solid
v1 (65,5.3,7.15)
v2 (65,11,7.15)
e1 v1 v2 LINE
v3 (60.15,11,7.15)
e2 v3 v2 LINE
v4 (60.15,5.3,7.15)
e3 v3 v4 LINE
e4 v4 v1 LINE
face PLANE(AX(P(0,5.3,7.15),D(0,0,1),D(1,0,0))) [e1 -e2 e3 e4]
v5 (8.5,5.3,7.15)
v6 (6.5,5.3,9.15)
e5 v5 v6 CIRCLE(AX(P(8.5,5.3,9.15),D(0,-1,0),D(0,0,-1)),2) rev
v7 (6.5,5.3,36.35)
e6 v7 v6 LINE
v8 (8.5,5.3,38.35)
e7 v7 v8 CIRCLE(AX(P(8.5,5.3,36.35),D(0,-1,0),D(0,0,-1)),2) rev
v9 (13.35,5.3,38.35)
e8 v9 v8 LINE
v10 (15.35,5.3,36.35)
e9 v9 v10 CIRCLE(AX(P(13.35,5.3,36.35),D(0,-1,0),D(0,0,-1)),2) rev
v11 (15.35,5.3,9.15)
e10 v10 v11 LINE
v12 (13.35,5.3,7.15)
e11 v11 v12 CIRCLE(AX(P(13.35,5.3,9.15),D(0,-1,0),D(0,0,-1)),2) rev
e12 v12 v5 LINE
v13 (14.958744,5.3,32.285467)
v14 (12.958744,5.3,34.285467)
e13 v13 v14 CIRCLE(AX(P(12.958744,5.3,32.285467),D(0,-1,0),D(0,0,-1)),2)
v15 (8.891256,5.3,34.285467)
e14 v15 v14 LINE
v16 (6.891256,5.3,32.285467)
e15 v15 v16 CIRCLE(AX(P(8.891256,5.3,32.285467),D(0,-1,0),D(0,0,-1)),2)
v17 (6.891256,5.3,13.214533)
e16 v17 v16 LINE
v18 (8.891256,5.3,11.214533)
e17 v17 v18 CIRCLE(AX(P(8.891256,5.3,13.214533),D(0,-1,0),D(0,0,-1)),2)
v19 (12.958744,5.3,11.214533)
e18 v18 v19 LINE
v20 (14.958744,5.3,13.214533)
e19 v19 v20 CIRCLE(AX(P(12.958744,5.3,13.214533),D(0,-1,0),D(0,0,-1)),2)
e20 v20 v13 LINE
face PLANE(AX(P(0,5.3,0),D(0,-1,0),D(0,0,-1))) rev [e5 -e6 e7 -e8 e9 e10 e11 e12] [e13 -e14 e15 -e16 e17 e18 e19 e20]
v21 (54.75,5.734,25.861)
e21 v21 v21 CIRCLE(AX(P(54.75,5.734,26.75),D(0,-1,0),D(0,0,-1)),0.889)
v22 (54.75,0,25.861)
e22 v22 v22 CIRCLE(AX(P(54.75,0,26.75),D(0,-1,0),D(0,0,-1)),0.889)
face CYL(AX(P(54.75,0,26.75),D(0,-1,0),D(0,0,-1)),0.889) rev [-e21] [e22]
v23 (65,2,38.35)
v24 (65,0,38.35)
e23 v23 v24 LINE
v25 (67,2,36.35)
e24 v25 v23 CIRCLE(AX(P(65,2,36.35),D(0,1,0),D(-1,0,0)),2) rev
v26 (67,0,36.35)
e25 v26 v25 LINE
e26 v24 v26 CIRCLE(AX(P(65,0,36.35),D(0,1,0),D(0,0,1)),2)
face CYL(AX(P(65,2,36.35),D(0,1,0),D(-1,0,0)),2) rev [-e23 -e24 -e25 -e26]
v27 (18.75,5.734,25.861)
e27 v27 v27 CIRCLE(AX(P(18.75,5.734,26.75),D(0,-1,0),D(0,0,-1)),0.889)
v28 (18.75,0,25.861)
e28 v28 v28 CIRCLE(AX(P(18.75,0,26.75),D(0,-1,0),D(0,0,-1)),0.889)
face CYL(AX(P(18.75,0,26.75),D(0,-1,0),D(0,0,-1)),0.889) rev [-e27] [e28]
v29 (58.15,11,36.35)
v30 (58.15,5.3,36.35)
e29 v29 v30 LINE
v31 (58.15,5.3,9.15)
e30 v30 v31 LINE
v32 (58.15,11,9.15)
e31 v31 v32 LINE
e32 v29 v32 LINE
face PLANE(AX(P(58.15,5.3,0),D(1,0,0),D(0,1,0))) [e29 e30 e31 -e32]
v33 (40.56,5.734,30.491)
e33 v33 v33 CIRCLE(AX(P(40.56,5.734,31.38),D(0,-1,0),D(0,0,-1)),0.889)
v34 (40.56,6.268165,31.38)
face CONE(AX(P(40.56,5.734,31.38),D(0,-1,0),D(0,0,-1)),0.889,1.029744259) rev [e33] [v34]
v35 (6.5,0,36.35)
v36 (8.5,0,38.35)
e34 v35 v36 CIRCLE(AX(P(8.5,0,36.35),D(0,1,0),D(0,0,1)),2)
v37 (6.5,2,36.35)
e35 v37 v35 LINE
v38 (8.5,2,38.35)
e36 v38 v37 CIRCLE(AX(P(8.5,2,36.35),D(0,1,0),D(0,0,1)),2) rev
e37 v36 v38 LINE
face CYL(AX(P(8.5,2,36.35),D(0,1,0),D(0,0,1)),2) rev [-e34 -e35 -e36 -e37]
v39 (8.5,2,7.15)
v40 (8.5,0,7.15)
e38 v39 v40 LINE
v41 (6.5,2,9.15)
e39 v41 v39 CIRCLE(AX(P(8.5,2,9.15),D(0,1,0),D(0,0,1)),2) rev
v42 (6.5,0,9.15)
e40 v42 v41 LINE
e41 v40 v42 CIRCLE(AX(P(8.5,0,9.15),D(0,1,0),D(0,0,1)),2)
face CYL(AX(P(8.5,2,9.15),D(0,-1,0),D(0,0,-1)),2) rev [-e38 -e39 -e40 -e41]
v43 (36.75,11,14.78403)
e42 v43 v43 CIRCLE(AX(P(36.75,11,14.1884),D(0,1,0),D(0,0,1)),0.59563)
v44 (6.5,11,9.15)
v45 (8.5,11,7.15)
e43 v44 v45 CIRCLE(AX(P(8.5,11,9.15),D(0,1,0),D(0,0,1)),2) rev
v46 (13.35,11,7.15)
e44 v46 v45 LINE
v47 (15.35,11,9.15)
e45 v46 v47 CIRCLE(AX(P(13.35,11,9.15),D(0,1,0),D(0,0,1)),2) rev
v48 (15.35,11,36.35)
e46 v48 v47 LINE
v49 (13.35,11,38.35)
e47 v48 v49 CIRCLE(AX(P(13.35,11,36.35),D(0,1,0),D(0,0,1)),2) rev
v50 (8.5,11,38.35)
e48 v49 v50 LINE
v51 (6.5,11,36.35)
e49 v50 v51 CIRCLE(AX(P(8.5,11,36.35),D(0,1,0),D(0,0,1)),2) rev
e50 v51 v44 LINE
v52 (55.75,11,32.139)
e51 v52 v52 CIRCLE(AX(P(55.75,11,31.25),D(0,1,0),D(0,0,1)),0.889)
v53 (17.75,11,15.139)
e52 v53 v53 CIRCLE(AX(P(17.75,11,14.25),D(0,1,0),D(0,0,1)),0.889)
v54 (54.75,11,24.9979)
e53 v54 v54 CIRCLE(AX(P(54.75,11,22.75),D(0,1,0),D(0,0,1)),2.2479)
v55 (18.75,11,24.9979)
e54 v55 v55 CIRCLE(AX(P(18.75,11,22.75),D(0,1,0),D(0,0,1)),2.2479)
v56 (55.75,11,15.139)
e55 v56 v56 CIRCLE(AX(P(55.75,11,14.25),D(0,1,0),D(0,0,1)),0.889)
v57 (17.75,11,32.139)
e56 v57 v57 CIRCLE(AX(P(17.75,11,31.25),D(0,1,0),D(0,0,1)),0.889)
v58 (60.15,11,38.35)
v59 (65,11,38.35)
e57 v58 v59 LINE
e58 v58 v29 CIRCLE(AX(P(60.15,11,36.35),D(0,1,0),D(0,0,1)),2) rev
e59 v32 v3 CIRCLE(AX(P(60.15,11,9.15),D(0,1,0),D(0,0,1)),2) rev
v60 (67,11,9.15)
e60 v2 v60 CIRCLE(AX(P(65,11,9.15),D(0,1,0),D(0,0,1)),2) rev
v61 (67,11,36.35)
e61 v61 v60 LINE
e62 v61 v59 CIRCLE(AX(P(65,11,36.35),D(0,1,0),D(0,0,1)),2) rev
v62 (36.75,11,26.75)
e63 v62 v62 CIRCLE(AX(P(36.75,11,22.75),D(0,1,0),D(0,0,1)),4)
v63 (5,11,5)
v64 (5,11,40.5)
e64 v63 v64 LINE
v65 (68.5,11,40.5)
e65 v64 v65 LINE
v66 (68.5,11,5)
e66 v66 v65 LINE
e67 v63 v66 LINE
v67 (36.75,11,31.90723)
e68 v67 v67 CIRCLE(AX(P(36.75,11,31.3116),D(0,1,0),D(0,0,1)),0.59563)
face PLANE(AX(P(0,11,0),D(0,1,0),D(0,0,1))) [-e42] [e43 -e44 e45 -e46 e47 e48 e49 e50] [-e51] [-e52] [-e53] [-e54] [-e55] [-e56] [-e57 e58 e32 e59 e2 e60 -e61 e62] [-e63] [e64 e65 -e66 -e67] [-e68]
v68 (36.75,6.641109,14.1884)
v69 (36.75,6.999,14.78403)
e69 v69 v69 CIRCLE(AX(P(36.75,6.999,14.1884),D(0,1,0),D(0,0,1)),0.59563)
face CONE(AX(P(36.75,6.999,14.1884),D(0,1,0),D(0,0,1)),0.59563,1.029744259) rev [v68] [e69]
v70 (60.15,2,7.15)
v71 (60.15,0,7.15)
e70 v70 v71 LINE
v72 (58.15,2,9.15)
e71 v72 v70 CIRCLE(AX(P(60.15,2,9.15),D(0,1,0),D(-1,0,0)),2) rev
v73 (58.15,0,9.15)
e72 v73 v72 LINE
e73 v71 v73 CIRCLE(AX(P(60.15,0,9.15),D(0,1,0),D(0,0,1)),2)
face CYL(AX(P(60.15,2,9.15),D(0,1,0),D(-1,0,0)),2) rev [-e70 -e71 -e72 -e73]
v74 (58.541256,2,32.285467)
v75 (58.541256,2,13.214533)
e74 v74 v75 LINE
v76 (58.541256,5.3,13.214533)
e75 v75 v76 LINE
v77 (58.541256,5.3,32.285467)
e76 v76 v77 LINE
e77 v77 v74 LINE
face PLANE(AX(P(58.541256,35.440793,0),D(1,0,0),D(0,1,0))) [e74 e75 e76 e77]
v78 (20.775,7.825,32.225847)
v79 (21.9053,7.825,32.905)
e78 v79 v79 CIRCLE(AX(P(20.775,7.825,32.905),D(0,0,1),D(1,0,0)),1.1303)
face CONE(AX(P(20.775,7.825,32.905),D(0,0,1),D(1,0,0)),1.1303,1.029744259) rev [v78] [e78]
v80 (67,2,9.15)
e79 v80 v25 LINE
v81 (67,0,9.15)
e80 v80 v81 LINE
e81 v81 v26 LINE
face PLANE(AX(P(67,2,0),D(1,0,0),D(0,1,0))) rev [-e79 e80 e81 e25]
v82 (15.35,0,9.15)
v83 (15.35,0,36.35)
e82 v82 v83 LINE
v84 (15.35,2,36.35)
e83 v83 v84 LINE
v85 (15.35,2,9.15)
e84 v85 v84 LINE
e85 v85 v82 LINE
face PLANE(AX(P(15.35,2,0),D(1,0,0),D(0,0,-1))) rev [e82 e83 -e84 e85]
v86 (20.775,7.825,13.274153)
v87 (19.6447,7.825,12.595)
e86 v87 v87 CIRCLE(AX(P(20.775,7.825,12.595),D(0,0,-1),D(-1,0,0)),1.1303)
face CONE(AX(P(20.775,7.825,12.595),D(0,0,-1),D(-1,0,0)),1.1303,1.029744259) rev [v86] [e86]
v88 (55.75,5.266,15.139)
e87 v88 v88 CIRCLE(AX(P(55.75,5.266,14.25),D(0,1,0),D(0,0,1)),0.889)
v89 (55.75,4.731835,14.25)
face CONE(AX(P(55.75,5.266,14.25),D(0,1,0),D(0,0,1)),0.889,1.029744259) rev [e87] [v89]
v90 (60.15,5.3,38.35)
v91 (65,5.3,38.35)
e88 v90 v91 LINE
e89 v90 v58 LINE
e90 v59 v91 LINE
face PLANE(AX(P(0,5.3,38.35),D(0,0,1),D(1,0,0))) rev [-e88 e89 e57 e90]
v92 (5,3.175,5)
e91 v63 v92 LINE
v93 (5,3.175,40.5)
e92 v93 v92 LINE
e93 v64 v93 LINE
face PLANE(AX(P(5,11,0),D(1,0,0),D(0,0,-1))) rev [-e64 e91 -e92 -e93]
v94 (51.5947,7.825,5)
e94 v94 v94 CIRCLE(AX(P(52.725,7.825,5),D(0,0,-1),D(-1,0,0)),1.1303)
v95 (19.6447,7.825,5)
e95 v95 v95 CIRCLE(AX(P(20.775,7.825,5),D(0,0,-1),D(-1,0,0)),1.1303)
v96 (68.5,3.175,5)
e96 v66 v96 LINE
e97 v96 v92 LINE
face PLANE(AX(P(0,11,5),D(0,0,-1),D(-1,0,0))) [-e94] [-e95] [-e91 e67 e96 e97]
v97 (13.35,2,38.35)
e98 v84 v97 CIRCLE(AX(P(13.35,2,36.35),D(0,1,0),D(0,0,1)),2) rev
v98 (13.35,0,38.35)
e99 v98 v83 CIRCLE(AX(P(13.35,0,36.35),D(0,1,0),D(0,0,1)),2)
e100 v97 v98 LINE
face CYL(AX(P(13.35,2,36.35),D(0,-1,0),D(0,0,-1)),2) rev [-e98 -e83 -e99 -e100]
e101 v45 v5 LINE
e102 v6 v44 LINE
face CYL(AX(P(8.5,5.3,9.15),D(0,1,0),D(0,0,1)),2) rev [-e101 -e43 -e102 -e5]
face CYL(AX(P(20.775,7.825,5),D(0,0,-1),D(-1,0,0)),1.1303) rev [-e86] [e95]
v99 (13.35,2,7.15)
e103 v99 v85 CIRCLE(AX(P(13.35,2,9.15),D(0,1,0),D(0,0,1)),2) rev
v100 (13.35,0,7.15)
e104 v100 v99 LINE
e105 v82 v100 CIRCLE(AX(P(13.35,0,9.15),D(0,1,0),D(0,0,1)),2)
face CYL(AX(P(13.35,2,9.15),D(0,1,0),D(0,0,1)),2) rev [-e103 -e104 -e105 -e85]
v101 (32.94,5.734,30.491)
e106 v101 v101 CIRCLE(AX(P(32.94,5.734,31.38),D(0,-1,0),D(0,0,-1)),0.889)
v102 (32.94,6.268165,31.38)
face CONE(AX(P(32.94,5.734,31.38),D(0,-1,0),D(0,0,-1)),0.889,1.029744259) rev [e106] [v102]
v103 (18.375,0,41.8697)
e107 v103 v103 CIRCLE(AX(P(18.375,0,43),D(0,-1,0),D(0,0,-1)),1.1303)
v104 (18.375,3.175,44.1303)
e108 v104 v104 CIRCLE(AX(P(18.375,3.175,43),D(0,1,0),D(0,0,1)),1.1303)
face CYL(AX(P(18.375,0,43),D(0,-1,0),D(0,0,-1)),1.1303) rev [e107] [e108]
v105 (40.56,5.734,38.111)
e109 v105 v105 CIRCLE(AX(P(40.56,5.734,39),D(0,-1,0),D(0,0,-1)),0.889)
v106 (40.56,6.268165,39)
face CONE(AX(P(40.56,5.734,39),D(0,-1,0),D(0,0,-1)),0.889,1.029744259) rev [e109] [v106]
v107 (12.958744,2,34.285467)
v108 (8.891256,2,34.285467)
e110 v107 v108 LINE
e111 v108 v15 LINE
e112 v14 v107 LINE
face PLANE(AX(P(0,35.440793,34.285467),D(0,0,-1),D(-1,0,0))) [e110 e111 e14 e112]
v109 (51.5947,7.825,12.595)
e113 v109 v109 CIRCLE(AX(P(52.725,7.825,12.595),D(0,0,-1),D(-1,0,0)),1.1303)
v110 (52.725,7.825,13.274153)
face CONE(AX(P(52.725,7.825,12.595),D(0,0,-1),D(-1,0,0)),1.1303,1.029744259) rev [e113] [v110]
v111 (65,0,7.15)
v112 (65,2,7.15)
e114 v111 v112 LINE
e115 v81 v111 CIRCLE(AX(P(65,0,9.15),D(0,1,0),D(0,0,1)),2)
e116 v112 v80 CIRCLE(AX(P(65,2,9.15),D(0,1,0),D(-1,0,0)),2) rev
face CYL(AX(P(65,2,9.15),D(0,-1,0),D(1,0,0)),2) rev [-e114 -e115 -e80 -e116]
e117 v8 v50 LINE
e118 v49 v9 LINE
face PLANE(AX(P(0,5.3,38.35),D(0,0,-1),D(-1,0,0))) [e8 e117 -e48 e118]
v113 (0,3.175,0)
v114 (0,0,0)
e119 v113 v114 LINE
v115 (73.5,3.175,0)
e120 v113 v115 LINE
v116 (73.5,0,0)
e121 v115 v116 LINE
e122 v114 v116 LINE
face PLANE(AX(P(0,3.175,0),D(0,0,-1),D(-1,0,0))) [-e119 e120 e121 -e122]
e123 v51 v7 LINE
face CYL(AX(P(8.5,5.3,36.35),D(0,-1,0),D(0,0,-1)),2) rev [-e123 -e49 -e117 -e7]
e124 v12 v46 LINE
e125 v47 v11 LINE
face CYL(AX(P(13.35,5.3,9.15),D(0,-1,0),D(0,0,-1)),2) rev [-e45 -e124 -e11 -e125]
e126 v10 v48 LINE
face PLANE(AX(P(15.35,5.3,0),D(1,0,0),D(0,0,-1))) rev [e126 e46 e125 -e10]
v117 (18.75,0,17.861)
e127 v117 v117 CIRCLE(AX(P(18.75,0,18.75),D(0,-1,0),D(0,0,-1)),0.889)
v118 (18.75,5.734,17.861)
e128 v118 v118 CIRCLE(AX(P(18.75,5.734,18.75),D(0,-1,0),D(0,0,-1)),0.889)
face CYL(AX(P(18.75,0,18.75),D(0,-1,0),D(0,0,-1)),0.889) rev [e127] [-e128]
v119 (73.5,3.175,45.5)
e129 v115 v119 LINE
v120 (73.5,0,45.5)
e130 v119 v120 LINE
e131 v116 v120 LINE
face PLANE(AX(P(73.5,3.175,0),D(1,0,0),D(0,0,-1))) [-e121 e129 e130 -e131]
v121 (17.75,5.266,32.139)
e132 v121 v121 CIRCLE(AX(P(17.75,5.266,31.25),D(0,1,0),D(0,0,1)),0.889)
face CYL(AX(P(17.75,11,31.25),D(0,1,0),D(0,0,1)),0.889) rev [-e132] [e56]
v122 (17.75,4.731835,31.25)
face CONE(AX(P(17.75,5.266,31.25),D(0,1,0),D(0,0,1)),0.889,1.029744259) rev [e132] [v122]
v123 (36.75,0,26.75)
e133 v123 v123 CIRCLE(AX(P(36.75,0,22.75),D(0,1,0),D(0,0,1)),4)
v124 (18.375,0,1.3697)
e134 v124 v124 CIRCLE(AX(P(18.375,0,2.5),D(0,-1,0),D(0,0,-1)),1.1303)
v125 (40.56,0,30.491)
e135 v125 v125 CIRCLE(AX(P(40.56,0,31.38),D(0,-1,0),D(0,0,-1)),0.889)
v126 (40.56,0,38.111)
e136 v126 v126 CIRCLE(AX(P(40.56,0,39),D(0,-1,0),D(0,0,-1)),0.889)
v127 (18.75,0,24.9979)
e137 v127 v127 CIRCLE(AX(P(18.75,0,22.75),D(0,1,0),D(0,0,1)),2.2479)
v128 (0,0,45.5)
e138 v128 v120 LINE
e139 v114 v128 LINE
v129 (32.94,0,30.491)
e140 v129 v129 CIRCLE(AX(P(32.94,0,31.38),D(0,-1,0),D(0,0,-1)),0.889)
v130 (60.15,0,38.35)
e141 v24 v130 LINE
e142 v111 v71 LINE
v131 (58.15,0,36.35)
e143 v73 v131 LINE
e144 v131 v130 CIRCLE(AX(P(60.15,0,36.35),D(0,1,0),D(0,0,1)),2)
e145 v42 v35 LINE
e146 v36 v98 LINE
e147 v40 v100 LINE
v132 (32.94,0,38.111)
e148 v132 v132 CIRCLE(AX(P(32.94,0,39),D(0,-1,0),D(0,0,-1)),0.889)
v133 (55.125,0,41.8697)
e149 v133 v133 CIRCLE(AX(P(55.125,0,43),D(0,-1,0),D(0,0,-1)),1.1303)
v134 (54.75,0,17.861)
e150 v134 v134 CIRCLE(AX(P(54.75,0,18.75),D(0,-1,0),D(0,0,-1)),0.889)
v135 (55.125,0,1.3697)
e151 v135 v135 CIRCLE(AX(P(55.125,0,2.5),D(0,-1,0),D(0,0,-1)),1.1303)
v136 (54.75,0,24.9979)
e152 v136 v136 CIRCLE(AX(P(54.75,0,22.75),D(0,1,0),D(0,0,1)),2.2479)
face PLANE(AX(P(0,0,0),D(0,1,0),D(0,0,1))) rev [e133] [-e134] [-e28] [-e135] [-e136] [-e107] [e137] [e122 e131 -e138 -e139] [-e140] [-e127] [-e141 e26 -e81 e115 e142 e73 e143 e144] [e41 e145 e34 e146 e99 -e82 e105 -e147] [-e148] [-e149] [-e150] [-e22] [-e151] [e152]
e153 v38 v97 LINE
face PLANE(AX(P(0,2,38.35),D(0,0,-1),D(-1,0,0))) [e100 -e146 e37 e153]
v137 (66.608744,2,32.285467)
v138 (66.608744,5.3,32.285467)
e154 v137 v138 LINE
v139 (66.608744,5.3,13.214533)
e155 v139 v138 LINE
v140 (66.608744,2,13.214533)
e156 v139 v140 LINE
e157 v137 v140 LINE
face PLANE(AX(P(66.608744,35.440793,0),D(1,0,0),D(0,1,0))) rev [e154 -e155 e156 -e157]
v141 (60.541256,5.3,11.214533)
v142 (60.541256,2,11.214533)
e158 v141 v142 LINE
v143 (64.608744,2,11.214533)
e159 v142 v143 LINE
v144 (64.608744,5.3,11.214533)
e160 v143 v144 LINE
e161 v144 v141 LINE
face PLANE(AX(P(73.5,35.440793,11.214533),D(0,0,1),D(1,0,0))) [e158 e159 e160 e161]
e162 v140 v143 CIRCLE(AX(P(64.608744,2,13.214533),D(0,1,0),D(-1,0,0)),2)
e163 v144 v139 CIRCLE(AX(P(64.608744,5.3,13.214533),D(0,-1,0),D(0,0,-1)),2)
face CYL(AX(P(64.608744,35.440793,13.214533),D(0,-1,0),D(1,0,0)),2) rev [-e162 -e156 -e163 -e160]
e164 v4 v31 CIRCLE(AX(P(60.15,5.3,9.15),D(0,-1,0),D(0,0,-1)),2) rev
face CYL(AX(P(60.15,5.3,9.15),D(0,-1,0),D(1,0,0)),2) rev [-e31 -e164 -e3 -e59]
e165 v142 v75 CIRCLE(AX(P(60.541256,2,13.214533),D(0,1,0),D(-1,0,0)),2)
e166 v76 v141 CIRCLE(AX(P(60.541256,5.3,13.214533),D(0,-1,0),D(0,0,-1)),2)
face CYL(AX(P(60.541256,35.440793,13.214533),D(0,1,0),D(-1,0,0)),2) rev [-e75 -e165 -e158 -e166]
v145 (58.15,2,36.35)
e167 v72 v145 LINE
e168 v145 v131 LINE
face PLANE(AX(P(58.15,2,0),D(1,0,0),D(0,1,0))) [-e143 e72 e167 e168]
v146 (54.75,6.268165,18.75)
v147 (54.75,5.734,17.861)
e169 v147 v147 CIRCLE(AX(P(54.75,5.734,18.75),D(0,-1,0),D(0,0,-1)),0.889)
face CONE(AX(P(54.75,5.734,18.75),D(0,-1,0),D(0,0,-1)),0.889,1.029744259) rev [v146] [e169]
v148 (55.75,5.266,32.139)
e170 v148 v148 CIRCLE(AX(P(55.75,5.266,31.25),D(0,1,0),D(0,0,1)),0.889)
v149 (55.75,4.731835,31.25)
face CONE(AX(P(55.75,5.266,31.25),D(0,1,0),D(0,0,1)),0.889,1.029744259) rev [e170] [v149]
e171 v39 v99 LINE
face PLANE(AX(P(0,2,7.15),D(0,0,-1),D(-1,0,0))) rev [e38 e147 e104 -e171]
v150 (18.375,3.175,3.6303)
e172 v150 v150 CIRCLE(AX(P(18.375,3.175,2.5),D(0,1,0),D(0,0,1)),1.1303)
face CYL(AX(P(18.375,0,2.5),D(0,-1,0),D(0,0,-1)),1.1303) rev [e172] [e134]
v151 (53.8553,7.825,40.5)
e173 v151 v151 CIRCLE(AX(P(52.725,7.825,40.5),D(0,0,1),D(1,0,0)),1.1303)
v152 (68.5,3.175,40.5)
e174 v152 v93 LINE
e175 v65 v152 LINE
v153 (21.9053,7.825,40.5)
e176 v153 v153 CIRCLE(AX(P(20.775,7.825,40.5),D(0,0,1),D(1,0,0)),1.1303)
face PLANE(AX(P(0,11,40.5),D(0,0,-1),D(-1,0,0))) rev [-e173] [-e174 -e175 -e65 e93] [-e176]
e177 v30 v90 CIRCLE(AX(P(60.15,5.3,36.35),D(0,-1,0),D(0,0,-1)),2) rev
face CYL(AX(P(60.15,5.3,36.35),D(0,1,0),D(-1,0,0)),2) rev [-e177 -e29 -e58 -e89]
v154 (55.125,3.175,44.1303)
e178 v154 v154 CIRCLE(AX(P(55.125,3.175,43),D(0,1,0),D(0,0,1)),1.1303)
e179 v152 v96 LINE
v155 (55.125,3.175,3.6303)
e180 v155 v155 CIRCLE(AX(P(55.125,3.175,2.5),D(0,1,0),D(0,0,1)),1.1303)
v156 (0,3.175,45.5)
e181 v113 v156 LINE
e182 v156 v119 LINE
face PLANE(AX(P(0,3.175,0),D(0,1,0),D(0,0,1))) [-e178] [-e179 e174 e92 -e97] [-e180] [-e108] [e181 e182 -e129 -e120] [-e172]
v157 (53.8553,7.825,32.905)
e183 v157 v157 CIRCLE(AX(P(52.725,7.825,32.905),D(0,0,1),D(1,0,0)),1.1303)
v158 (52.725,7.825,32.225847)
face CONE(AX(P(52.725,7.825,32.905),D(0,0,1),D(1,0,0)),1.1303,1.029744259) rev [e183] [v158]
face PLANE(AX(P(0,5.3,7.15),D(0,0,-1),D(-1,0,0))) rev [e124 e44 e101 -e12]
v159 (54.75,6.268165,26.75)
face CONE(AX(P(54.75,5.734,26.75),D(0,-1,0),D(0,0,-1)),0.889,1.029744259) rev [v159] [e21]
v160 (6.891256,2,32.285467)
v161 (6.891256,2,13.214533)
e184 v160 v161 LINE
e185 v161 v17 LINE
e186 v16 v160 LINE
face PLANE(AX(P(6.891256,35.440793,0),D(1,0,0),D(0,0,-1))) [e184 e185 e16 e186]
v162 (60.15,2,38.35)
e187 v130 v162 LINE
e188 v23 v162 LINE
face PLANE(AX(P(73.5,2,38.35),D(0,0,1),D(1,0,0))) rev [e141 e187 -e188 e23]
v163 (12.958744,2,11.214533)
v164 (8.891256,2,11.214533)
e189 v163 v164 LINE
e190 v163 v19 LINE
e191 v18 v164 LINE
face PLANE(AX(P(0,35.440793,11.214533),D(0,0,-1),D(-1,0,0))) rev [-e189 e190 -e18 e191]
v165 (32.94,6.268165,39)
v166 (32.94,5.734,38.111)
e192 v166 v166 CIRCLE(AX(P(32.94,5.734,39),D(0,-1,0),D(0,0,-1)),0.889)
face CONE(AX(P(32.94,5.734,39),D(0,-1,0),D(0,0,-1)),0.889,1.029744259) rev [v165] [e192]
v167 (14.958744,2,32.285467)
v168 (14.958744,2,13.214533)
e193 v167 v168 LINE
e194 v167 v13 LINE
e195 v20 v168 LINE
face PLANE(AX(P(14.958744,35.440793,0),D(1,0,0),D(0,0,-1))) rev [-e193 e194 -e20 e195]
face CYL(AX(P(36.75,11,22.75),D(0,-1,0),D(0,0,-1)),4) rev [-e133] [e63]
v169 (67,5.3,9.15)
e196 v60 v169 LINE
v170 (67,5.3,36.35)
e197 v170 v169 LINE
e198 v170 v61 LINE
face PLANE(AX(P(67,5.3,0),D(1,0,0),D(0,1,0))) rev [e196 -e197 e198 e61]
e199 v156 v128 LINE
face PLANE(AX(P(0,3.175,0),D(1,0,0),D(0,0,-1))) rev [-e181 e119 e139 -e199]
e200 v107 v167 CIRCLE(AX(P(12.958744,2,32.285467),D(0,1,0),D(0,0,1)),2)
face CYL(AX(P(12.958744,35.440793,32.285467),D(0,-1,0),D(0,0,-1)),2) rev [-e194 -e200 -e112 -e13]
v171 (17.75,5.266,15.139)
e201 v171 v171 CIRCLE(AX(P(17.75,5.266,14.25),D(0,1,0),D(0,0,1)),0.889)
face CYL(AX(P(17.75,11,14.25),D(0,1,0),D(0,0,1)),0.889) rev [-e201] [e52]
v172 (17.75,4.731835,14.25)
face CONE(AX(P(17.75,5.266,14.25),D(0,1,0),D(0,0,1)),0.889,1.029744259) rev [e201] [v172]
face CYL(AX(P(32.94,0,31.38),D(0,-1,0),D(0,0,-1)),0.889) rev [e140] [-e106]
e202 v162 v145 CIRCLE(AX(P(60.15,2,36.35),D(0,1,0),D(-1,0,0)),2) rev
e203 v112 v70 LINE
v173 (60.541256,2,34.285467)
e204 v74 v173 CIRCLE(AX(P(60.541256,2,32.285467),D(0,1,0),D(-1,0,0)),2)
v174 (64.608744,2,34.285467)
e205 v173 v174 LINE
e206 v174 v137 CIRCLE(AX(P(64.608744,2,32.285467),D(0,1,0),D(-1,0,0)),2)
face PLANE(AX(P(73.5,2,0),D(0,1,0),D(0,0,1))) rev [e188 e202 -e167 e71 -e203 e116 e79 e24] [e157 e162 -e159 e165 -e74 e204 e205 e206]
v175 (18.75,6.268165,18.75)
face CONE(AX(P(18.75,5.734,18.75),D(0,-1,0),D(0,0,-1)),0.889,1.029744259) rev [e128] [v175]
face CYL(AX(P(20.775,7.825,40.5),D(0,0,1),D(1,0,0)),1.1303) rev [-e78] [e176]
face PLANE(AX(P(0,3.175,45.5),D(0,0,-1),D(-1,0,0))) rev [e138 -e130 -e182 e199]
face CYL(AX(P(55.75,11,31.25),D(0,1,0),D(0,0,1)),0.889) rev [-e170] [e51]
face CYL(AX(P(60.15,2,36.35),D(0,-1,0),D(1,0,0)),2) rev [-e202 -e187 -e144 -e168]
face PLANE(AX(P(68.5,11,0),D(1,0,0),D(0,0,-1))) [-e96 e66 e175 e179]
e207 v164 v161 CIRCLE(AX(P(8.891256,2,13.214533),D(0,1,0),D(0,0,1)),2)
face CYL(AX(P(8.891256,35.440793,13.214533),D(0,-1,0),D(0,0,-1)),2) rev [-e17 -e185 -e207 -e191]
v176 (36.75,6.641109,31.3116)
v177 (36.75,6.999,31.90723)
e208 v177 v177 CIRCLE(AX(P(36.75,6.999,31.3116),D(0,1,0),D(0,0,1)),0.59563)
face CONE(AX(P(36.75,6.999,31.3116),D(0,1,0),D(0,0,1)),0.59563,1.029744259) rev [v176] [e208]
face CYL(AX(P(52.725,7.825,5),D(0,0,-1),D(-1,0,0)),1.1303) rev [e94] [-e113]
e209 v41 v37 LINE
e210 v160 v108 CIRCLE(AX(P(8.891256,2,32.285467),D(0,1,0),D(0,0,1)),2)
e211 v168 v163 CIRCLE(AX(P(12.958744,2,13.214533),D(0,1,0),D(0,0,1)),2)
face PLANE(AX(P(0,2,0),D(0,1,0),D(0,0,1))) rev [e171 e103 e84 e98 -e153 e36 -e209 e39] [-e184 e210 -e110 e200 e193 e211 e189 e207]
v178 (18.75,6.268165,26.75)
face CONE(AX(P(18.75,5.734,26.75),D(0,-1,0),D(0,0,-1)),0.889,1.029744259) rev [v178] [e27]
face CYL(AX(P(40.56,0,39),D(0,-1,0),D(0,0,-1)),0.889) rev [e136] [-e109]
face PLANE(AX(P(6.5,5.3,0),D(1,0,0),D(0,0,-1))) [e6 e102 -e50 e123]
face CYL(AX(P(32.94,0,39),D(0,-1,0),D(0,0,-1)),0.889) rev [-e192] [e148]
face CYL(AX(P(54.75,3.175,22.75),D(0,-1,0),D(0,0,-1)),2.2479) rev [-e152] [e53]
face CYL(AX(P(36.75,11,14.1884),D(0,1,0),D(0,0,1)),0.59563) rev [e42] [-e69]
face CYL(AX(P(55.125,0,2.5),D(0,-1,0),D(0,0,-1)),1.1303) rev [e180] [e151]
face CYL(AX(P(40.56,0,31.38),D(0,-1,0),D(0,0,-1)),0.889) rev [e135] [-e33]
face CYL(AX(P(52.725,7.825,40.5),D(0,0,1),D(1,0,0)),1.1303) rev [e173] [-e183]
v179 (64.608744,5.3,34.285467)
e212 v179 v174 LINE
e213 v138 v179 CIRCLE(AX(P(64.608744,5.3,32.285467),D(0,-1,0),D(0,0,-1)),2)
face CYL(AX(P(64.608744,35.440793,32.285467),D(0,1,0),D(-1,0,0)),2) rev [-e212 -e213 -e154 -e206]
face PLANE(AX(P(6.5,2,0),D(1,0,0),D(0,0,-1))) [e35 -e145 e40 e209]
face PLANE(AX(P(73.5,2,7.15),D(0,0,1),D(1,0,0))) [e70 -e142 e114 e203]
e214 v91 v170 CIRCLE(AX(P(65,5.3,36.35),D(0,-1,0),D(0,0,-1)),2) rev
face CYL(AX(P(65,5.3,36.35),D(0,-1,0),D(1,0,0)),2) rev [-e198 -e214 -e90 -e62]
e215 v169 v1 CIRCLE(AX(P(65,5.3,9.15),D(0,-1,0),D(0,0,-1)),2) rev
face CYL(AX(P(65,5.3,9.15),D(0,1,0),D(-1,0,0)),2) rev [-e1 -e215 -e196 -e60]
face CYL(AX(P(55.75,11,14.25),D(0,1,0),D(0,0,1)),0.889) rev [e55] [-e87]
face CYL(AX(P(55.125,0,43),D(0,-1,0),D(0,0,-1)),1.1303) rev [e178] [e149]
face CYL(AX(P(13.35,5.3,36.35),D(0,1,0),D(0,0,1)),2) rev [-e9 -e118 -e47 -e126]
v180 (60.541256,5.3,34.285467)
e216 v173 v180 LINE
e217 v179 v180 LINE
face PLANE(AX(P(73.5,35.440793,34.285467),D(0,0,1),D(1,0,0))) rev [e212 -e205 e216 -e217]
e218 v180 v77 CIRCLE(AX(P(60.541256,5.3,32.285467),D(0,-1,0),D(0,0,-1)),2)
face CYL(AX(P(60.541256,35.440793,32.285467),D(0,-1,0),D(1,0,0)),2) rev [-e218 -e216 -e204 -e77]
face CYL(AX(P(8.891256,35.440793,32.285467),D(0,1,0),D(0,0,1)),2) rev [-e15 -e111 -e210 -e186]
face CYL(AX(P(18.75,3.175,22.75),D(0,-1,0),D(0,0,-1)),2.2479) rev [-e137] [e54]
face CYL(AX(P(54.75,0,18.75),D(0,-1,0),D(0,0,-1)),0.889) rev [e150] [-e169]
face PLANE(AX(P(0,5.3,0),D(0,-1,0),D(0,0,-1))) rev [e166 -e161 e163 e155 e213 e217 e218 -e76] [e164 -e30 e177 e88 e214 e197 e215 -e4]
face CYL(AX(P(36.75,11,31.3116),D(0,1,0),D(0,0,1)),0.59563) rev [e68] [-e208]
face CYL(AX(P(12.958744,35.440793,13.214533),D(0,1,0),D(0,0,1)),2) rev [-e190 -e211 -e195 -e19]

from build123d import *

# Parameters (mm, degrees)
MAIN_SKETCH_W                         = 73.5
MAIN_SKETCH_H                         = 45.5
MAIN_SKETCH_W_2                       = 8.85
MAIN_SKETCH_H_2                       = 31.2
MAIN_SKETCH_R                         = 2.2479
LIP_DEPTH                             = 3.175
MOUNTING_BASE_OUTLINE_W               = 63.5
MOUNTING_BASE_OUTLINE_H               = 35.5
MOUNTING_BASE_OUTLINE_R               = 2.2479
MOUNTING_BASE_OUTLINE_R_2             = 4
MOUNTING_BASE_DEPTH                   = 11
HEATER_CART_4_40_TAPS_D               = 2.2606
HEATER_CART_4_40_TAPS_DEPTH           = 7.595
HEATER_CART_4_40_TAPS_TIP             = 0.679152758
HEATER_CART_4_40_TAPS_ON_FACE_2_D     = 2.2606
HEATER_CART_4_40_TAPS_ON_FACE_2_DEPTH = 7.595
HEATER_CART_4_40_TAPS_ON_FACE_2_TIP   = 0.679152758
MAIN_SKETCH_12_W                      = 8.85
MAIN_SKETCH_12_H                      = 31.2
MAIN_SKETCH_12_R                      = 0.285
BOTTOM_SQUARE_CUTOUT_DEPTH            = 2
SQUARE_MICRO_D_CUTOUT_START           = 5.3
SQUARE_MICRO_D_CUTOUT_OUTLINE_W       = 8.85
SQUARE_MICRO_D_CUTOUT_OUTLINE_H       = 31.2
SQUARE_MICRO_D_CUTOUT_OUTLINE_R       = 0.285
SQUARE_MICRO_D_CUTOUT_DEPTH           = 5.7
SKETCH15_W                            = 8.067488146
SKETCH15_H                            = 23.070933647
CUT_EXTRUDE1_DEPTH                    = 11
INTERNAL_CORNER_CUTOUTS_FILLET_R      = 2
CHIP_CLAMP_0_80_TAPS_AT_2_COUNT       = 2
CHIP_CLAMP_0_80_TAPS_AT_2_PITCH       = 17.1232
CHIP_CLAMP_0_80_TAPS_AT_3_COUNT       = 2
CHIP_CLAMP_0_80_TAPS_AT_3_PITCH       = 17.1232
F_2_56_CLOSE_CLEAR_43_0_089_D         = 2.2606
PCB_2_56_TAPS_D                       = 1.778
PCB_2_56_TAPS_DEPTH                   = 5.734
PCB_2_56_TAPS_TIP                     = 0.53416509
BOTTOM_COVER_2_56_TAPS_D              = 1.778
BOTTOM_COVER_2_56_TAPS_DEPTH          = 5.734
BOTTOM_COVER_2_56_TAPS_TIP            = 0.53416509
F_2_56_TAPPED_HOLE1_D                 = 1.778
F_2_56_TAPPED_HOLE1_DEPTH             = 5.734
F_2_56_TAPPED_HOLE1_TIP               = 0.53416509


# Read off the part's stored shape, not the designer's step: Mounting_Base, Square_Micro_D_Cutout
with BuildPart() as part:
    # Main_Sketch → Lip (new body)
    with BuildSketch(Plane(origin=(0, 0, 0), x_dir=(1, 0, 0), z_dir=(0, 1, 0))):
        with Locations((36.75, -22.75)):
            Rectangle(MAIN_SKETCH_W, MAIN_SKETCH_H)
        with Locations((10.925, -22.749999985)):
            Rectangle(MAIN_SKETCH_W_2, MAIN_SKETCH_H_2, mode=Mode.SUBTRACT)
        with Locations(Location((18.75, -22.75, 0), (0, 0, 270))):
            Circle(MAIN_SKETCH_R, mode=Mode.SUBTRACT)
        with BuildLine():
            ThreePointArc((31.675, -20.175), (29.907233047, -15.907233047), (34.175, -17.675))
            Line((34.175, -17.675), (39.325, -17.675))
            ThreePointArc((39.325, -17.675), (43.592766953, -15.907233047), (41.825, -20.175))
            Line((41.825, -20.175), (41.825, -25.325))
            ThreePointArc((41.825, -25.325), (43.592766953, -29.592766953), (39.325, -27.825))
            Line((39.325, -27.825), (34.175, -27.825))
            ThreePointArc((34.175, -27.825), (29.907233047, -29.592766953), (31.675, -25.325))
            Line((31.675, -25.325), (31.675, -20.175))
        make_face(mode=Mode.SUBTRACT)
        with Locations(Location((54.75, -22.75, 0), (0, 0, 270))):
            Circle(MAIN_SKETCH_R, mode=Mode.SUBTRACT)
    extrude(amount=LIP_DEPTH)

    # Mounting_Base outline → Mounting_Base (add)
    with BuildSketch(Plane(origin=(0, 0, 0), x_dir=(1, 0, 0), z_dir=(0, 1, 0))):
        with Locations((36.75, -22.75)):
            Rectangle(MOUNTING_BASE_OUTLINE_W, MOUNTING_BASE_OUTLINE_H)
        with Locations((18.75, -22.75)):
            Circle(MOUNTING_BASE_OUTLINE_R, mode=Mode.SUBTRACT)
        with Locations((54.75, -22.75)):
            Circle(MOUNTING_BASE_OUTLINE_R, mode=Mode.SUBTRACT)
        with Locations((36.75, -22.75)):
            Circle(MOUNTING_BASE_OUTLINE_R_2, mode=Mode.SUBTRACT)
    extrude(amount=MOUNTING_BASE_DEPTH)

    # Heater_Cart_#4-40_Taps
    with Locations(Plane(origin=(52.725, 7.825, 5), x_dir=(-1, 0, 0), z_dir=(0, 0, -1))):
        with Locations((0, 0), (31.95, 0)):
            Hole(HEATER_CART_4_40_TAPS_D / 2, depth=HEATER_CART_4_40_TAPS_DEPTH)
            with Locations((0, 0, -(HEATER_CART_4_40_TAPS_DEPTH + HEATER_CART_4_40_TAPS_TIP / 2))):  # 118° drill point
                Cone(0, HEATER_CART_4_40_TAPS_D / 2, HEATER_CART_4_40_TAPS_TIP, mode=Mode.SUBTRACT)

    # Heater_Cart_#4-40_Taps on face 2
    with Locations(Plane(origin=(20.775, 7.825, 40.5), x_dir=(1, 0, 0), z_dir=(0, 0, 1))):
        with Locations((0, 0), (31.95, 0)):
            Hole(HEATER_CART_4_40_TAPS_ON_FACE_2_D / 2, depth=HEATER_CART_4_40_TAPS_ON_FACE_2_DEPTH)
            with Locations((0, 0, -(HEATER_CART_4_40_TAPS_ON_FACE_2_DEPTH + HEATER_CART_4_40_TAPS_ON_FACE_2_TIP / 2))):  # 118° drill point
                Cone(0, HEATER_CART_4_40_TAPS_ON_FACE_2_D / 2, HEATER_CART_4_40_TAPS_ON_FACE_2_TIP, mode=Mode.SUBTRACT)

    # Main_Sketch<12> → Bottom_square_cutout (cut)
    # profile 1 of 2: a face of its own
    with BuildSketch(Plane(origin=(0, 0, 0), x_dir=(1, 0, 0), z_dir=(0, 1, 0))):
        with Locations((10.925, -22.749999985)):
            Rectangle(MAIN_SKETCH_12_W, MAIN_SKETCH_12_H)
        with BuildLine():
            ThreePointArc((10.385689992, -35.285466808), (9.155254643, -35.471894814), (7.986136174, -35.045410869))
            ThreePointArc((7.986136174, -35.045410869), (7.18175843, -34.143309058), (6.891255927, -32.970099985))
            Line((6.891255927, -32.970099985), (6.891255927, -12.529899985))
            ThreePointArc((6.891255927, -12.529899985), (7.18175845, -11.356690961), (7.986136174, -10.454589189))
            ThreePointArc((7.986136174, -10.454589189), (9.155254643, -10.028105244), (10.385689992, -10.21453325))
            Line((10.385689992, -10.21453325), (13.424612074, -11.500982853))
            ThreePointArc((13.424612074, -11.500982853), (14.540409069, -12.427601581), (14.958744073, -13.816349588))
            Line((14.958744073, -13.816349588), (14.958744073, -31.683650456))
            ThreePointArc((14.958744073, -31.683650456), (14.540409073, -33.072398471), (13.424612074, -33.999017205))
            Line((13.424612074, -33.999017205), (10.385689992, -35.285466808))
        make_face(mode=Mode.SUBTRACT)
    # profile 2 of 2: a face of its own
    with BuildSketch(Plane(origin=(0, 0, 0), x_dir=(1, 0, 0), z_dir=(0, 1, 0))):
        with BuildLine():
            ThreePointArc((7.986136174, -35.045410869), (7.18175843, -34.143309058), (6.891255927, -32.970099985))
            Line((6.891255927, -32.970099985), (6.891255927, -12.529899985))
            ThreePointArc((6.891255927, -12.529899985), (7.18175845, -11.356690961), (7.986136174, -10.454589189))
            ThreePointArc((7.986136174, -10.454589189), (9.155254643, -10.028105244), (10.385689992, -10.21453325))
            Line((10.385689992, -10.21453325), (13.424612074, -11.500982853))
            ThreePointArc((13.424612074, -11.500982853), (14.540409069, -12.427601581), (14.958744073, -13.816349588))
            Line((14.958744073, -13.816349588), (14.958744073, -31.683650456))
            ThreePointArc((14.958744073, -31.683650456), (14.540409073, -33.072398471), (13.424612074, -33.999017205))
            Line((13.424612074, -33.999017205), (10.385689992, -35.285466808))
            ThreePointArc((10.385689992, -35.285466808), (9.155254643, -35.471894814), (7.986136174, -35.045410869))
        make_face()
        with Locations(Location((10.239255927, -22.75, 0), (0, 0, 270))):
            Circle(MAIN_SKETCH_12_R, mode=Mode.SUBTRACT)
    bottom_square_cutout = extrude(amount=BOTTOM_SQUARE_CUTOUT_DEPTH, mode=Mode.SUBTRACT)

    # Square_Micro_D_Cutout outline → Square_Micro_D_Cutout (cut)
    with BuildSketch(Plane(origin=(0, 0, 0), x_dir=(1, 0, 0), z_dir=(0, 1, 0)).offset(SQUARE_MICRO_D_CUTOUT_START)):
        with Locations((10.925, -22.749999985)):
            Rectangle(SQUARE_MICRO_D_CUTOUT_OUTLINE_W, SQUARE_MICRO_D_CUTOUT_OUTLINE_H)
        with Locations((10.239255927, -22.75)):
            Circle(SQUARE_MICRO_D_CUTOUT_OUTLINE_R, mode=Mode.SUBTRACT)
    square_micro_d_cutout = extrude(amount=SQUARE_MICRO_D_CUTOUT_DEPTH, mode=Mode.SUBTRACT)

    # Sketch15 → Cut-Extrude1 (cut)
    with BuildSketch(Plane(origin=(0, 0, 0), x_dir=(1, 0, 0), z_dir=(0, 1, 0))):
        with Locations((10.925, -22.749999985)):
            Rectangle(SKETCH15_W, SKETCH15_H)
    cut_extrude1 = extrude(amount=CUT_EXTRUDE1_DEPTH, mode=Mode.SUBTRACT)

    # MicroD_Mirror: Bottom_square_cutout, Square_Micro_D_Cutout, Cut-Extrude1 across plane
    add(bottom_square_cutout.mirror(Plane(origin=(36.75, 0, 0), x_dir=(0, 0, 1), z_dir=(1, 0, 0))), mode=Mode.SUBTRACT)
    add(square_micro_d_cutout.mirror(Plane(origin=(36.75, 0, 0), x_dir=(0, 0, 1), z_dir=(1, 0, 0))), mode=Mode.SUBTRACT)
    add(cut_extrude1.mirror(Plane(origin=(36.75, 0, 0), x_dir=(0, 0, 1), z_dir=(1, 0, 0))), mode=Mode.SUBTRACT)

    # Internal_Corner_cutouts_fillet
    internal_corner_cutouts_fillet_edges = [part.edges().sort_by_distance(p)[0] for p in [
        (15.35, 1, 38.349999985),
        (15.35, 1, 7.149999985),
        (6.5, 1, 7.149999985),
        (6.5, 1, 38.349999985),
        (15.35, 8.15, 38.349999985),
        (6.5, 8.15, 38.349999985),
        (6.5, 8.15, 7.149999985),
        (15.35, 8.15, 7.149999985),
        (14.958744073, 3.65, 34.285466808),
        (14.958744073, 3.65, 11.214533161),
        (6.891255927, 3.65, 11.214533161),
        (6.891255927, 3.65, 34.285466808),
        (58.15, 1, 7.149999985),
        (58.15, 1, 38.349999985),
        (67, 1, 38.349999985),
        (67, 1, 7.149999985),
        (67, 8.15, 7.149999985),
        (67, 8.15, 38.349999985),
        (58.15, 8.15, 38.349999985),
        (58.15, 8.15, 7.149999985),
        (58.541255927, 3.65, 11.214533161),
        (58.541255927, 3.65, 34.285466808),
        (66.608744073, 3.65, 34.285466808),
        (66.608744073, 3.65, 11.214533161),
    ]]
    fillet(internal_corner_cutouts_fillet_edges, radius=INTERNAL_CORNER_CUTOUTS_FILLET_R)

    # Sketch3 → Chip_Clamp_#0-80 Taps (revolve, cut)
    with BuildSketch(Plane(origin=(36.75, 11, 31.3116), x_dir=(0, 0, 1), z_dir=(1, 0, 0))):
        Polygon((0, 0), (0, 4.358890611), (0.59563, 4.001), (0.59563, 0), align=None)
    chip_clamp_0_80_taps = revolve(axis=Axis((36.75, 17.35, 31.3116), (0, -1, 0)), mode=Mode.SUBTRACT)

    # Chip_Clamp_#0-80 Taps at 2: Chip_Clamp_#0-80 Taps ×2
    with Locations(*[(0, 0, -i * CHIP_CLAMP_0_80_TAPS_AT_2_PITCH) for i in range(1, CHIP_CLAMP_0_80_TAPS_AT_2_COUNT)]):
        add(chip_clamp_0_80_taps, mode=Mode.SUBTRACT)

    # Chip_Clamp_#0-80 Taps at 3: Chip_Clamp_#0-80 Taps ×2
    with Locations(*[(0, 0, -i * CHIP_CLAMP_0_80_TAPS_AT_3_PITCH) for i in range(1, CHIP_CLAMP_0_80_TAPS_AT_3_COUNT)]):
        add(chip_clamp_0_80_taps, mode=Mode.SUBTRACT)

    # 2-56_Close_Clear#43 (0.089) (through all)
    with Locations(Plane(origin=(18.375, 0, 43), x_dir=(0, 0, -1), z_dir=(0, -1, 0))):
        with Locations((0, 0), (40.5, 0), (40.5, 36.75), (0, 36.75)):
            Hole(F_2_56_CLOSE_CLEAR_43_0_089_D / 2)

    # PCB #2-56 Taps
    with Locations(Plane(origin=(17.75, 11, 14.25), x_dir=(0, 0, 1), z_dir=(0, 1, 0))):
        with Locations((0, 0), (17, 0), (0, 38), (17, 38)):
            Hole(PCB_2_56_TAPS_D / 2, depth=PCB_2_56_TAPS_DEPTH)
            with Locations((0, 0, -(PCB_2_56_TAPS_DEPTH + PCB_2_56_TAPS_TIP / 2))):  # 118° drill point
                Cone(0, PCB_2_56_TAPS_D / 2, PCB_2_56_TAPS_TIP, mode=Mode.SUBTRACT)

    # Bottom_Cover#2-56 Taps
    with Locations(Plane(origin=(54.75, 0, 18.75), x_dir=(0, 0, -1), z_dir=(0, -1, 0))):
        with Locations((0, 0), (-8, 0), (-8, -36), (0, -36)):
            Hole(BOTTOM_COVER_2_56_TAPS_D / 2, depth=BOTTOM_COVER_2_56_TAPS_DEPTH)
            with Locations((0, 0, -(BOTTOM_COVER_2_56_TAPS_DEPTH + BOTTOM_COVER_2_56_TAPS_TIP / 2))):  # 118° drill point
                Cone(0, BOTTOM_COVER_2_56_TAPS_D / 2, BOTTOM_COVER_2_56_TAPS_TIP, mode=Mode.SUBTRACT)

    # #2-56 Tapped Hole1
    with Locations(Plane(origin=(32.94, 0, 31.38), x_dir=(0, 0, -1), z_dir=(0, -1, 0))):
        with Locations((0, 0), (-7.62, 0), (-7.62, 7.62), (0, 7.62)):
            Hole(F_2_56_TAPPED_HOLE1_D / 2, depth=F_2_56_TAPPED_HOLE1_DEPTH)
            with Locations((0, 0, -(F_2_56_TAPPED_HOLE1_DEPTH + F_2_56_TAPPED_HOLE1_TIP / 2))):  # 118° drill point
                Cone(0, F_2_56_TAPPED_HOLE1_D / 2, F_2_56_TAPPED_HOLE1_TIP, mode=Mode.SUBTRACT)


solid = part.part
